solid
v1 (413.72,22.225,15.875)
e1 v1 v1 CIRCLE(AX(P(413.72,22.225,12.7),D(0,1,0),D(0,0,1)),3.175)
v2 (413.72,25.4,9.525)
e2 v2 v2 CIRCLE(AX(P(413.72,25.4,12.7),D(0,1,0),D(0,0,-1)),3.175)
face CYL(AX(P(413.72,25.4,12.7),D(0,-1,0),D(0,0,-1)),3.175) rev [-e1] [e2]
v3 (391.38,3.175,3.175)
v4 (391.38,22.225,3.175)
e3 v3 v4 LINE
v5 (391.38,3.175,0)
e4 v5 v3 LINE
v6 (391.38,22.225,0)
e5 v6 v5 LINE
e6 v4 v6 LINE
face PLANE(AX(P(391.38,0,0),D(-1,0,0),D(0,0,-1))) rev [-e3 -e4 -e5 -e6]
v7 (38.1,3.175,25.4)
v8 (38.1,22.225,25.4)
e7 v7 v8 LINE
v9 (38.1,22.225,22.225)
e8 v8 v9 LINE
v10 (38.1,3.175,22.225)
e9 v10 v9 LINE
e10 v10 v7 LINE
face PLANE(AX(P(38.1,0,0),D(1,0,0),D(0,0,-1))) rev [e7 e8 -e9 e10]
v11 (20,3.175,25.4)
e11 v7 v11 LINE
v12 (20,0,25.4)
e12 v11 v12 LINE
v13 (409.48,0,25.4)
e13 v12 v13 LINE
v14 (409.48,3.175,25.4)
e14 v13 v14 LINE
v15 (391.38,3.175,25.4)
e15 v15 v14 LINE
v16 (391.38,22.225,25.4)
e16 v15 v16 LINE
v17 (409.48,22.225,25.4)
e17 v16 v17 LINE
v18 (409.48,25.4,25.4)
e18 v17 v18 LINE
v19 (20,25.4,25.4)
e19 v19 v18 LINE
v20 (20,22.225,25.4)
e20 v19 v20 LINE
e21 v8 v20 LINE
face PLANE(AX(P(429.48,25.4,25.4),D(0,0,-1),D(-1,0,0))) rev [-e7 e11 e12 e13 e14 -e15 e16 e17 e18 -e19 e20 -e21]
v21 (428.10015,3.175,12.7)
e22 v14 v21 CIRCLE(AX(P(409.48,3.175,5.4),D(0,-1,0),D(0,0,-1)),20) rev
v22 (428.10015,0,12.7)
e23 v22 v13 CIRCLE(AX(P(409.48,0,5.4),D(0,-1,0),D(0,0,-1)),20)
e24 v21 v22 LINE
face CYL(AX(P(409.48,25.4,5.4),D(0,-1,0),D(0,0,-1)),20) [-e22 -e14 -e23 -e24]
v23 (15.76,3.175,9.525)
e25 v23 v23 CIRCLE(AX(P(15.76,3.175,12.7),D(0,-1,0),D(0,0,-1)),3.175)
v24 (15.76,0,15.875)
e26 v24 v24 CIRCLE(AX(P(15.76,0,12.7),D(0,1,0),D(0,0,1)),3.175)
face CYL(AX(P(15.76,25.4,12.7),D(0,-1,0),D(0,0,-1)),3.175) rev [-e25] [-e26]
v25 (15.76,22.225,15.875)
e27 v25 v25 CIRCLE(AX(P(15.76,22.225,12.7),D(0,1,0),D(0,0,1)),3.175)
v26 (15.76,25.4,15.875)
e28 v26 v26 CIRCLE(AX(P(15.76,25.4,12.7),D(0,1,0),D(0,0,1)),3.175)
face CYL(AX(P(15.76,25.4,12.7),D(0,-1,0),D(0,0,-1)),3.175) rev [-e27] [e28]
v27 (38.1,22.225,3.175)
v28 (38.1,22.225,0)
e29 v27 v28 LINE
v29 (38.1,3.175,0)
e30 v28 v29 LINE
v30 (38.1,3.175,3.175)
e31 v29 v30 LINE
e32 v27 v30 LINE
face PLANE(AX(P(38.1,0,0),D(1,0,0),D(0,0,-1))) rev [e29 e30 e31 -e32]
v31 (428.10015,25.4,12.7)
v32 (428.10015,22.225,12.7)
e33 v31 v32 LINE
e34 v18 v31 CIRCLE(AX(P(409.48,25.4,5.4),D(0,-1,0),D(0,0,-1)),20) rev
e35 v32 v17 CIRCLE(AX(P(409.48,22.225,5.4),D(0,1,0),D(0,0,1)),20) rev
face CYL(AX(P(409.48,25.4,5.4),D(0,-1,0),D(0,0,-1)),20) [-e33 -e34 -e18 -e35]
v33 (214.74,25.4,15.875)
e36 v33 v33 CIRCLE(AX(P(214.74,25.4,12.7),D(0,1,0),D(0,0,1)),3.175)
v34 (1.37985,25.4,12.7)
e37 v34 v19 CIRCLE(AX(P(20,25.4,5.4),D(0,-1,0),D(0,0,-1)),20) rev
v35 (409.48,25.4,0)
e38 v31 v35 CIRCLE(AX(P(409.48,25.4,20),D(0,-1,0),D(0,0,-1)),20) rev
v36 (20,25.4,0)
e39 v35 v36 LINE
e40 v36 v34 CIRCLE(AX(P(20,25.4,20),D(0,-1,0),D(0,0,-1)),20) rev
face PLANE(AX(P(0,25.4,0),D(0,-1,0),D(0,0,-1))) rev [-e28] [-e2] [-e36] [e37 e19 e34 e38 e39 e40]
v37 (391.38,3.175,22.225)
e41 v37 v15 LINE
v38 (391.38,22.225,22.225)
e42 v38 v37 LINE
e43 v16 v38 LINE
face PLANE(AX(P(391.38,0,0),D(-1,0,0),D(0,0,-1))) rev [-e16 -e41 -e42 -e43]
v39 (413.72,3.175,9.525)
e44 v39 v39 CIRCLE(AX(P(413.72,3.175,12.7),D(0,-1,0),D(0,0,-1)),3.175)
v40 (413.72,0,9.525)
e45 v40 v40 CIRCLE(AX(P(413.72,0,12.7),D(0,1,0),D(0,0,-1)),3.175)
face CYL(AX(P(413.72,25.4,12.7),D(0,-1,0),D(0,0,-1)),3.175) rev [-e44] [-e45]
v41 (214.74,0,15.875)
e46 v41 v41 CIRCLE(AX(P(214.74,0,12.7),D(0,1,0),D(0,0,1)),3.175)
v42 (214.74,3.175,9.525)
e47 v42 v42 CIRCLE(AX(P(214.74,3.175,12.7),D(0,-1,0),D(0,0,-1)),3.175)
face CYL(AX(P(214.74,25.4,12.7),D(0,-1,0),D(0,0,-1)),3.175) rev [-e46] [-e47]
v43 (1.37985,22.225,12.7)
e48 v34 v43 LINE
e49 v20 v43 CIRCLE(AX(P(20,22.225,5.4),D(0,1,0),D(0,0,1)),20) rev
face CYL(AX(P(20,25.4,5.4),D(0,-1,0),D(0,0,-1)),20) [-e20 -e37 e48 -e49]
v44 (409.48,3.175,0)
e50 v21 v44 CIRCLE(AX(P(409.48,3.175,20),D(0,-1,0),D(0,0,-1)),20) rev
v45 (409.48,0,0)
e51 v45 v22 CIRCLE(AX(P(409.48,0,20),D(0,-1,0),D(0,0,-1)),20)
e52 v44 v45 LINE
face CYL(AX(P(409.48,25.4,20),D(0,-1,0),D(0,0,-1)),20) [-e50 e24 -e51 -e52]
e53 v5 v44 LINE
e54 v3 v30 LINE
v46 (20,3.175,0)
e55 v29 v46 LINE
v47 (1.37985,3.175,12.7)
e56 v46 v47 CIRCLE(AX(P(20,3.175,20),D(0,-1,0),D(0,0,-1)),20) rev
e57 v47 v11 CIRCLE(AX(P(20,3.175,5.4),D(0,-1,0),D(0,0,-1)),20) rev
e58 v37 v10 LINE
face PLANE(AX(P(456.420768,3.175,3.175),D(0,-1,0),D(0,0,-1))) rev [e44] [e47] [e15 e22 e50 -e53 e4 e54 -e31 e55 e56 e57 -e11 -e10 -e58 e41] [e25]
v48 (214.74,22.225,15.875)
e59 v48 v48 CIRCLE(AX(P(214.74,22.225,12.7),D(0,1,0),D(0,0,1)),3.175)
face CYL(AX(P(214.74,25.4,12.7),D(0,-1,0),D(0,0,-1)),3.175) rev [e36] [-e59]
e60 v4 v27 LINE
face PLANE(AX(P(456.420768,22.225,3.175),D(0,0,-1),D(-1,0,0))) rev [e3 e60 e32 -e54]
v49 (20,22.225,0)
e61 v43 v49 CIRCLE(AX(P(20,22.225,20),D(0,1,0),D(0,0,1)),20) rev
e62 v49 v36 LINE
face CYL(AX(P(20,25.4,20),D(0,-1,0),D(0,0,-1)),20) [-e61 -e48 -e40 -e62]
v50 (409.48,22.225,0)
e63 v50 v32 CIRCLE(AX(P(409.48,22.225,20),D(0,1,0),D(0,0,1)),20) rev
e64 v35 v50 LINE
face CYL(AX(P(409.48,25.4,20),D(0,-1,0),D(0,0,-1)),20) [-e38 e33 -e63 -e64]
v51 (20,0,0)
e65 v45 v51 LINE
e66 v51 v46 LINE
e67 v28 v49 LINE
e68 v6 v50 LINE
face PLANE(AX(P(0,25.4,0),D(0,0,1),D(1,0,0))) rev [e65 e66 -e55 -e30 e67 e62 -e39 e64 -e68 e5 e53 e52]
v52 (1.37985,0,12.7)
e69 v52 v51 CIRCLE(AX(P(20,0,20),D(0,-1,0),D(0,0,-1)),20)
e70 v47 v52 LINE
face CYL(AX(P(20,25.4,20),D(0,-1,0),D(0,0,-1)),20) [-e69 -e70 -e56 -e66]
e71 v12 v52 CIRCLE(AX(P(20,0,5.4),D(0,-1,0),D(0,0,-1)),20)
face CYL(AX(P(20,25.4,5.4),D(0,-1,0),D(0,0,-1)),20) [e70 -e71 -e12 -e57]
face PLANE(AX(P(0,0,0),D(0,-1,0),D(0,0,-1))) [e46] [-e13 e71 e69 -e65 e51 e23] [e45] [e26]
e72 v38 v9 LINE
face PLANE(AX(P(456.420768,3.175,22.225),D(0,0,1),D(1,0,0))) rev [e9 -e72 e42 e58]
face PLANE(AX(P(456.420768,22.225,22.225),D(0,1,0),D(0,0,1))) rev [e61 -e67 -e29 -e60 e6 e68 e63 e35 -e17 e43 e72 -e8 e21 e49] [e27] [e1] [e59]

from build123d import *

# Parameters (mm, degrees)
SKETCH1_W           = 429.48
SKETCH1_H           = 25.4
SKETCH1_R           = 3.175
BOSS_EXTRUDE1_DEPTH = 25.4
CUT_EXTRUDE1_REACH  = 432.98
SKETCH2_W           = 19.05
SKETCH2_H           = 19.05
SKETCH4_W           = 25.4
SKETCH4_H           = 19.05
CUT_EXTRUDE2_DEPTH  = 38.1
FILLET1_R           = 20


with BuildPart() as part:
    # Sketch1 → Boss-Extrude1 (new body)
    with BuildSketch(Plane(origin=(0, 0, 0), x_dir=(1, 0, 0), z_dir=(0, 1, 0))):
        with Locations((214.74, -12.7)):
            Rectangle(SKETCH1_W, SKETCH1_H)
        with Locations(Location((214.74, -12.7, 0), (0, 0, 270))):
            Circle(SKETCH1_R, mode=Mode.SUBTRACT)
        with Locations(Location((15.76, -12.7, 0), (0, 0, 270))):
            Circle(SKETCH1_R, mode=Mode.SUBTRACT)
        with Locations(Location((413.72, -12.7, 0), (0, 0, 90))):
            Circle(SKETCH1_R, mode=Mode.SUBTRACT)
    extrude(amount=BOSS_EXTRUDE1_DEPTH)

    # Cut-Extrude1: up to this face of the body (flat: up to its plane)
    cut_extrude1_end = Plane(part.part.faces().sort_by_distance((429.48, 12.7, 12.7))[0])
    # Sketch2 → Cut-Extrude1 (cut, up to the picked face)
    with BuildSketch(Plane.ZY, mode=Mode.PRIVATE) as cut_extrude1_sk1:
        with Locations((12.7, 12.7)):
            Rectangle(SKETCH2_W, SKETCH2_H)
    cut_extrude1_tool1 = split(extrude(cut_extrude1_sk1.sketch, amount=-CUT_EXTRUDE1_REACH, mode=Mode.PRIVATE), bisect_by=cut_extrude1_end, keep=Keep.BOTH, mode=Mode.PRIVATE)
    add(cut_extrude1_tool1.solids().sort_by(Axis((0, 12.7, 12.7), (1, 0, 0)))[0], mode=Mode.SUBTRACT)

    # Sketch4 → Cut-Extrude2 (cut)
    with BuildSketch(Plane.ZY):
        with Locations((12.7, 12.7)):
            Rectangle(SKETCH4_W, SKETCH4_H)
    cut_extrude2 = extrude(amount=-CUT_EXTRUDE2_DEPTH, mode=Mode.SUBTRACT)

    # Mirror1: Cut-Extrude2 across plane
    add(cut_extrude2.mirror(Plane.ZY.offset(-214.74)), mode=Mode.SUBTRACT)

    # Fillet1
    # the kernel refuses this fillet: 20 mm, written as the material it takes off along each edge
    with BuildSketch(Plane(origin=(429.48, -50, 0), x_dir=(-1, 0, 0), z_dir=(0, 1, 0)), Plane(origin=(429.48, -27.775, 0), x_dir=(-1, 0, 0), z_dir=(0, 1, 0)), Plane(origin=(0, -27.775, 25.4), x_dir=(1, 0, 0), z_dir=(0, 1, 0))) as fillet1_piece_1:
        with BuildLine():
            CenterArc((FILLET1_R, FILLET1_R), FILLET1_R, 180, 90)
            Line((0, FILLET1_R), (0, 0))
            Line((0, 0), (FILLET1_R, 0))
        make_face()
    extrude(amount=103.175, mode=Mode.SUBTRACT)
    with BuildSketch(Plane(origin=(429.48, -50, 25.4), x_dir=(-1, 0, 0), z_dir=(0, 1, 0)), Plane(origin=(429.48, -27.775, 25.4), x_dir=(-1, 0, 0), z_dir=(0, 1, 0)), Plane(origin=(0, -50, 25.4), x_dir=(0, 0, -1), z_dir=(0, 1, 0)), Plane(origin=(0, -50, 0), x_dir=(1, 0, 0), z_dir=(0, 1, 0)), Plane(origin=(0, -27.775, 0), x_dir=(1, 0, 0), z_dir=(0, 1, 0))) as fillet1_piece_2:
        with BuildLine():
            CenterArc((FILLET1_R, -FILLET1_R), FILLET1_R, 90, 90)
            Line((0, -FILLET1_R), (0, 0))
            Line((0, 0), (FILLET1_R, 0))
        make_face()
    extrude(amount=103.175, mode=Mode.SUBTRACT)


solid = part.part
